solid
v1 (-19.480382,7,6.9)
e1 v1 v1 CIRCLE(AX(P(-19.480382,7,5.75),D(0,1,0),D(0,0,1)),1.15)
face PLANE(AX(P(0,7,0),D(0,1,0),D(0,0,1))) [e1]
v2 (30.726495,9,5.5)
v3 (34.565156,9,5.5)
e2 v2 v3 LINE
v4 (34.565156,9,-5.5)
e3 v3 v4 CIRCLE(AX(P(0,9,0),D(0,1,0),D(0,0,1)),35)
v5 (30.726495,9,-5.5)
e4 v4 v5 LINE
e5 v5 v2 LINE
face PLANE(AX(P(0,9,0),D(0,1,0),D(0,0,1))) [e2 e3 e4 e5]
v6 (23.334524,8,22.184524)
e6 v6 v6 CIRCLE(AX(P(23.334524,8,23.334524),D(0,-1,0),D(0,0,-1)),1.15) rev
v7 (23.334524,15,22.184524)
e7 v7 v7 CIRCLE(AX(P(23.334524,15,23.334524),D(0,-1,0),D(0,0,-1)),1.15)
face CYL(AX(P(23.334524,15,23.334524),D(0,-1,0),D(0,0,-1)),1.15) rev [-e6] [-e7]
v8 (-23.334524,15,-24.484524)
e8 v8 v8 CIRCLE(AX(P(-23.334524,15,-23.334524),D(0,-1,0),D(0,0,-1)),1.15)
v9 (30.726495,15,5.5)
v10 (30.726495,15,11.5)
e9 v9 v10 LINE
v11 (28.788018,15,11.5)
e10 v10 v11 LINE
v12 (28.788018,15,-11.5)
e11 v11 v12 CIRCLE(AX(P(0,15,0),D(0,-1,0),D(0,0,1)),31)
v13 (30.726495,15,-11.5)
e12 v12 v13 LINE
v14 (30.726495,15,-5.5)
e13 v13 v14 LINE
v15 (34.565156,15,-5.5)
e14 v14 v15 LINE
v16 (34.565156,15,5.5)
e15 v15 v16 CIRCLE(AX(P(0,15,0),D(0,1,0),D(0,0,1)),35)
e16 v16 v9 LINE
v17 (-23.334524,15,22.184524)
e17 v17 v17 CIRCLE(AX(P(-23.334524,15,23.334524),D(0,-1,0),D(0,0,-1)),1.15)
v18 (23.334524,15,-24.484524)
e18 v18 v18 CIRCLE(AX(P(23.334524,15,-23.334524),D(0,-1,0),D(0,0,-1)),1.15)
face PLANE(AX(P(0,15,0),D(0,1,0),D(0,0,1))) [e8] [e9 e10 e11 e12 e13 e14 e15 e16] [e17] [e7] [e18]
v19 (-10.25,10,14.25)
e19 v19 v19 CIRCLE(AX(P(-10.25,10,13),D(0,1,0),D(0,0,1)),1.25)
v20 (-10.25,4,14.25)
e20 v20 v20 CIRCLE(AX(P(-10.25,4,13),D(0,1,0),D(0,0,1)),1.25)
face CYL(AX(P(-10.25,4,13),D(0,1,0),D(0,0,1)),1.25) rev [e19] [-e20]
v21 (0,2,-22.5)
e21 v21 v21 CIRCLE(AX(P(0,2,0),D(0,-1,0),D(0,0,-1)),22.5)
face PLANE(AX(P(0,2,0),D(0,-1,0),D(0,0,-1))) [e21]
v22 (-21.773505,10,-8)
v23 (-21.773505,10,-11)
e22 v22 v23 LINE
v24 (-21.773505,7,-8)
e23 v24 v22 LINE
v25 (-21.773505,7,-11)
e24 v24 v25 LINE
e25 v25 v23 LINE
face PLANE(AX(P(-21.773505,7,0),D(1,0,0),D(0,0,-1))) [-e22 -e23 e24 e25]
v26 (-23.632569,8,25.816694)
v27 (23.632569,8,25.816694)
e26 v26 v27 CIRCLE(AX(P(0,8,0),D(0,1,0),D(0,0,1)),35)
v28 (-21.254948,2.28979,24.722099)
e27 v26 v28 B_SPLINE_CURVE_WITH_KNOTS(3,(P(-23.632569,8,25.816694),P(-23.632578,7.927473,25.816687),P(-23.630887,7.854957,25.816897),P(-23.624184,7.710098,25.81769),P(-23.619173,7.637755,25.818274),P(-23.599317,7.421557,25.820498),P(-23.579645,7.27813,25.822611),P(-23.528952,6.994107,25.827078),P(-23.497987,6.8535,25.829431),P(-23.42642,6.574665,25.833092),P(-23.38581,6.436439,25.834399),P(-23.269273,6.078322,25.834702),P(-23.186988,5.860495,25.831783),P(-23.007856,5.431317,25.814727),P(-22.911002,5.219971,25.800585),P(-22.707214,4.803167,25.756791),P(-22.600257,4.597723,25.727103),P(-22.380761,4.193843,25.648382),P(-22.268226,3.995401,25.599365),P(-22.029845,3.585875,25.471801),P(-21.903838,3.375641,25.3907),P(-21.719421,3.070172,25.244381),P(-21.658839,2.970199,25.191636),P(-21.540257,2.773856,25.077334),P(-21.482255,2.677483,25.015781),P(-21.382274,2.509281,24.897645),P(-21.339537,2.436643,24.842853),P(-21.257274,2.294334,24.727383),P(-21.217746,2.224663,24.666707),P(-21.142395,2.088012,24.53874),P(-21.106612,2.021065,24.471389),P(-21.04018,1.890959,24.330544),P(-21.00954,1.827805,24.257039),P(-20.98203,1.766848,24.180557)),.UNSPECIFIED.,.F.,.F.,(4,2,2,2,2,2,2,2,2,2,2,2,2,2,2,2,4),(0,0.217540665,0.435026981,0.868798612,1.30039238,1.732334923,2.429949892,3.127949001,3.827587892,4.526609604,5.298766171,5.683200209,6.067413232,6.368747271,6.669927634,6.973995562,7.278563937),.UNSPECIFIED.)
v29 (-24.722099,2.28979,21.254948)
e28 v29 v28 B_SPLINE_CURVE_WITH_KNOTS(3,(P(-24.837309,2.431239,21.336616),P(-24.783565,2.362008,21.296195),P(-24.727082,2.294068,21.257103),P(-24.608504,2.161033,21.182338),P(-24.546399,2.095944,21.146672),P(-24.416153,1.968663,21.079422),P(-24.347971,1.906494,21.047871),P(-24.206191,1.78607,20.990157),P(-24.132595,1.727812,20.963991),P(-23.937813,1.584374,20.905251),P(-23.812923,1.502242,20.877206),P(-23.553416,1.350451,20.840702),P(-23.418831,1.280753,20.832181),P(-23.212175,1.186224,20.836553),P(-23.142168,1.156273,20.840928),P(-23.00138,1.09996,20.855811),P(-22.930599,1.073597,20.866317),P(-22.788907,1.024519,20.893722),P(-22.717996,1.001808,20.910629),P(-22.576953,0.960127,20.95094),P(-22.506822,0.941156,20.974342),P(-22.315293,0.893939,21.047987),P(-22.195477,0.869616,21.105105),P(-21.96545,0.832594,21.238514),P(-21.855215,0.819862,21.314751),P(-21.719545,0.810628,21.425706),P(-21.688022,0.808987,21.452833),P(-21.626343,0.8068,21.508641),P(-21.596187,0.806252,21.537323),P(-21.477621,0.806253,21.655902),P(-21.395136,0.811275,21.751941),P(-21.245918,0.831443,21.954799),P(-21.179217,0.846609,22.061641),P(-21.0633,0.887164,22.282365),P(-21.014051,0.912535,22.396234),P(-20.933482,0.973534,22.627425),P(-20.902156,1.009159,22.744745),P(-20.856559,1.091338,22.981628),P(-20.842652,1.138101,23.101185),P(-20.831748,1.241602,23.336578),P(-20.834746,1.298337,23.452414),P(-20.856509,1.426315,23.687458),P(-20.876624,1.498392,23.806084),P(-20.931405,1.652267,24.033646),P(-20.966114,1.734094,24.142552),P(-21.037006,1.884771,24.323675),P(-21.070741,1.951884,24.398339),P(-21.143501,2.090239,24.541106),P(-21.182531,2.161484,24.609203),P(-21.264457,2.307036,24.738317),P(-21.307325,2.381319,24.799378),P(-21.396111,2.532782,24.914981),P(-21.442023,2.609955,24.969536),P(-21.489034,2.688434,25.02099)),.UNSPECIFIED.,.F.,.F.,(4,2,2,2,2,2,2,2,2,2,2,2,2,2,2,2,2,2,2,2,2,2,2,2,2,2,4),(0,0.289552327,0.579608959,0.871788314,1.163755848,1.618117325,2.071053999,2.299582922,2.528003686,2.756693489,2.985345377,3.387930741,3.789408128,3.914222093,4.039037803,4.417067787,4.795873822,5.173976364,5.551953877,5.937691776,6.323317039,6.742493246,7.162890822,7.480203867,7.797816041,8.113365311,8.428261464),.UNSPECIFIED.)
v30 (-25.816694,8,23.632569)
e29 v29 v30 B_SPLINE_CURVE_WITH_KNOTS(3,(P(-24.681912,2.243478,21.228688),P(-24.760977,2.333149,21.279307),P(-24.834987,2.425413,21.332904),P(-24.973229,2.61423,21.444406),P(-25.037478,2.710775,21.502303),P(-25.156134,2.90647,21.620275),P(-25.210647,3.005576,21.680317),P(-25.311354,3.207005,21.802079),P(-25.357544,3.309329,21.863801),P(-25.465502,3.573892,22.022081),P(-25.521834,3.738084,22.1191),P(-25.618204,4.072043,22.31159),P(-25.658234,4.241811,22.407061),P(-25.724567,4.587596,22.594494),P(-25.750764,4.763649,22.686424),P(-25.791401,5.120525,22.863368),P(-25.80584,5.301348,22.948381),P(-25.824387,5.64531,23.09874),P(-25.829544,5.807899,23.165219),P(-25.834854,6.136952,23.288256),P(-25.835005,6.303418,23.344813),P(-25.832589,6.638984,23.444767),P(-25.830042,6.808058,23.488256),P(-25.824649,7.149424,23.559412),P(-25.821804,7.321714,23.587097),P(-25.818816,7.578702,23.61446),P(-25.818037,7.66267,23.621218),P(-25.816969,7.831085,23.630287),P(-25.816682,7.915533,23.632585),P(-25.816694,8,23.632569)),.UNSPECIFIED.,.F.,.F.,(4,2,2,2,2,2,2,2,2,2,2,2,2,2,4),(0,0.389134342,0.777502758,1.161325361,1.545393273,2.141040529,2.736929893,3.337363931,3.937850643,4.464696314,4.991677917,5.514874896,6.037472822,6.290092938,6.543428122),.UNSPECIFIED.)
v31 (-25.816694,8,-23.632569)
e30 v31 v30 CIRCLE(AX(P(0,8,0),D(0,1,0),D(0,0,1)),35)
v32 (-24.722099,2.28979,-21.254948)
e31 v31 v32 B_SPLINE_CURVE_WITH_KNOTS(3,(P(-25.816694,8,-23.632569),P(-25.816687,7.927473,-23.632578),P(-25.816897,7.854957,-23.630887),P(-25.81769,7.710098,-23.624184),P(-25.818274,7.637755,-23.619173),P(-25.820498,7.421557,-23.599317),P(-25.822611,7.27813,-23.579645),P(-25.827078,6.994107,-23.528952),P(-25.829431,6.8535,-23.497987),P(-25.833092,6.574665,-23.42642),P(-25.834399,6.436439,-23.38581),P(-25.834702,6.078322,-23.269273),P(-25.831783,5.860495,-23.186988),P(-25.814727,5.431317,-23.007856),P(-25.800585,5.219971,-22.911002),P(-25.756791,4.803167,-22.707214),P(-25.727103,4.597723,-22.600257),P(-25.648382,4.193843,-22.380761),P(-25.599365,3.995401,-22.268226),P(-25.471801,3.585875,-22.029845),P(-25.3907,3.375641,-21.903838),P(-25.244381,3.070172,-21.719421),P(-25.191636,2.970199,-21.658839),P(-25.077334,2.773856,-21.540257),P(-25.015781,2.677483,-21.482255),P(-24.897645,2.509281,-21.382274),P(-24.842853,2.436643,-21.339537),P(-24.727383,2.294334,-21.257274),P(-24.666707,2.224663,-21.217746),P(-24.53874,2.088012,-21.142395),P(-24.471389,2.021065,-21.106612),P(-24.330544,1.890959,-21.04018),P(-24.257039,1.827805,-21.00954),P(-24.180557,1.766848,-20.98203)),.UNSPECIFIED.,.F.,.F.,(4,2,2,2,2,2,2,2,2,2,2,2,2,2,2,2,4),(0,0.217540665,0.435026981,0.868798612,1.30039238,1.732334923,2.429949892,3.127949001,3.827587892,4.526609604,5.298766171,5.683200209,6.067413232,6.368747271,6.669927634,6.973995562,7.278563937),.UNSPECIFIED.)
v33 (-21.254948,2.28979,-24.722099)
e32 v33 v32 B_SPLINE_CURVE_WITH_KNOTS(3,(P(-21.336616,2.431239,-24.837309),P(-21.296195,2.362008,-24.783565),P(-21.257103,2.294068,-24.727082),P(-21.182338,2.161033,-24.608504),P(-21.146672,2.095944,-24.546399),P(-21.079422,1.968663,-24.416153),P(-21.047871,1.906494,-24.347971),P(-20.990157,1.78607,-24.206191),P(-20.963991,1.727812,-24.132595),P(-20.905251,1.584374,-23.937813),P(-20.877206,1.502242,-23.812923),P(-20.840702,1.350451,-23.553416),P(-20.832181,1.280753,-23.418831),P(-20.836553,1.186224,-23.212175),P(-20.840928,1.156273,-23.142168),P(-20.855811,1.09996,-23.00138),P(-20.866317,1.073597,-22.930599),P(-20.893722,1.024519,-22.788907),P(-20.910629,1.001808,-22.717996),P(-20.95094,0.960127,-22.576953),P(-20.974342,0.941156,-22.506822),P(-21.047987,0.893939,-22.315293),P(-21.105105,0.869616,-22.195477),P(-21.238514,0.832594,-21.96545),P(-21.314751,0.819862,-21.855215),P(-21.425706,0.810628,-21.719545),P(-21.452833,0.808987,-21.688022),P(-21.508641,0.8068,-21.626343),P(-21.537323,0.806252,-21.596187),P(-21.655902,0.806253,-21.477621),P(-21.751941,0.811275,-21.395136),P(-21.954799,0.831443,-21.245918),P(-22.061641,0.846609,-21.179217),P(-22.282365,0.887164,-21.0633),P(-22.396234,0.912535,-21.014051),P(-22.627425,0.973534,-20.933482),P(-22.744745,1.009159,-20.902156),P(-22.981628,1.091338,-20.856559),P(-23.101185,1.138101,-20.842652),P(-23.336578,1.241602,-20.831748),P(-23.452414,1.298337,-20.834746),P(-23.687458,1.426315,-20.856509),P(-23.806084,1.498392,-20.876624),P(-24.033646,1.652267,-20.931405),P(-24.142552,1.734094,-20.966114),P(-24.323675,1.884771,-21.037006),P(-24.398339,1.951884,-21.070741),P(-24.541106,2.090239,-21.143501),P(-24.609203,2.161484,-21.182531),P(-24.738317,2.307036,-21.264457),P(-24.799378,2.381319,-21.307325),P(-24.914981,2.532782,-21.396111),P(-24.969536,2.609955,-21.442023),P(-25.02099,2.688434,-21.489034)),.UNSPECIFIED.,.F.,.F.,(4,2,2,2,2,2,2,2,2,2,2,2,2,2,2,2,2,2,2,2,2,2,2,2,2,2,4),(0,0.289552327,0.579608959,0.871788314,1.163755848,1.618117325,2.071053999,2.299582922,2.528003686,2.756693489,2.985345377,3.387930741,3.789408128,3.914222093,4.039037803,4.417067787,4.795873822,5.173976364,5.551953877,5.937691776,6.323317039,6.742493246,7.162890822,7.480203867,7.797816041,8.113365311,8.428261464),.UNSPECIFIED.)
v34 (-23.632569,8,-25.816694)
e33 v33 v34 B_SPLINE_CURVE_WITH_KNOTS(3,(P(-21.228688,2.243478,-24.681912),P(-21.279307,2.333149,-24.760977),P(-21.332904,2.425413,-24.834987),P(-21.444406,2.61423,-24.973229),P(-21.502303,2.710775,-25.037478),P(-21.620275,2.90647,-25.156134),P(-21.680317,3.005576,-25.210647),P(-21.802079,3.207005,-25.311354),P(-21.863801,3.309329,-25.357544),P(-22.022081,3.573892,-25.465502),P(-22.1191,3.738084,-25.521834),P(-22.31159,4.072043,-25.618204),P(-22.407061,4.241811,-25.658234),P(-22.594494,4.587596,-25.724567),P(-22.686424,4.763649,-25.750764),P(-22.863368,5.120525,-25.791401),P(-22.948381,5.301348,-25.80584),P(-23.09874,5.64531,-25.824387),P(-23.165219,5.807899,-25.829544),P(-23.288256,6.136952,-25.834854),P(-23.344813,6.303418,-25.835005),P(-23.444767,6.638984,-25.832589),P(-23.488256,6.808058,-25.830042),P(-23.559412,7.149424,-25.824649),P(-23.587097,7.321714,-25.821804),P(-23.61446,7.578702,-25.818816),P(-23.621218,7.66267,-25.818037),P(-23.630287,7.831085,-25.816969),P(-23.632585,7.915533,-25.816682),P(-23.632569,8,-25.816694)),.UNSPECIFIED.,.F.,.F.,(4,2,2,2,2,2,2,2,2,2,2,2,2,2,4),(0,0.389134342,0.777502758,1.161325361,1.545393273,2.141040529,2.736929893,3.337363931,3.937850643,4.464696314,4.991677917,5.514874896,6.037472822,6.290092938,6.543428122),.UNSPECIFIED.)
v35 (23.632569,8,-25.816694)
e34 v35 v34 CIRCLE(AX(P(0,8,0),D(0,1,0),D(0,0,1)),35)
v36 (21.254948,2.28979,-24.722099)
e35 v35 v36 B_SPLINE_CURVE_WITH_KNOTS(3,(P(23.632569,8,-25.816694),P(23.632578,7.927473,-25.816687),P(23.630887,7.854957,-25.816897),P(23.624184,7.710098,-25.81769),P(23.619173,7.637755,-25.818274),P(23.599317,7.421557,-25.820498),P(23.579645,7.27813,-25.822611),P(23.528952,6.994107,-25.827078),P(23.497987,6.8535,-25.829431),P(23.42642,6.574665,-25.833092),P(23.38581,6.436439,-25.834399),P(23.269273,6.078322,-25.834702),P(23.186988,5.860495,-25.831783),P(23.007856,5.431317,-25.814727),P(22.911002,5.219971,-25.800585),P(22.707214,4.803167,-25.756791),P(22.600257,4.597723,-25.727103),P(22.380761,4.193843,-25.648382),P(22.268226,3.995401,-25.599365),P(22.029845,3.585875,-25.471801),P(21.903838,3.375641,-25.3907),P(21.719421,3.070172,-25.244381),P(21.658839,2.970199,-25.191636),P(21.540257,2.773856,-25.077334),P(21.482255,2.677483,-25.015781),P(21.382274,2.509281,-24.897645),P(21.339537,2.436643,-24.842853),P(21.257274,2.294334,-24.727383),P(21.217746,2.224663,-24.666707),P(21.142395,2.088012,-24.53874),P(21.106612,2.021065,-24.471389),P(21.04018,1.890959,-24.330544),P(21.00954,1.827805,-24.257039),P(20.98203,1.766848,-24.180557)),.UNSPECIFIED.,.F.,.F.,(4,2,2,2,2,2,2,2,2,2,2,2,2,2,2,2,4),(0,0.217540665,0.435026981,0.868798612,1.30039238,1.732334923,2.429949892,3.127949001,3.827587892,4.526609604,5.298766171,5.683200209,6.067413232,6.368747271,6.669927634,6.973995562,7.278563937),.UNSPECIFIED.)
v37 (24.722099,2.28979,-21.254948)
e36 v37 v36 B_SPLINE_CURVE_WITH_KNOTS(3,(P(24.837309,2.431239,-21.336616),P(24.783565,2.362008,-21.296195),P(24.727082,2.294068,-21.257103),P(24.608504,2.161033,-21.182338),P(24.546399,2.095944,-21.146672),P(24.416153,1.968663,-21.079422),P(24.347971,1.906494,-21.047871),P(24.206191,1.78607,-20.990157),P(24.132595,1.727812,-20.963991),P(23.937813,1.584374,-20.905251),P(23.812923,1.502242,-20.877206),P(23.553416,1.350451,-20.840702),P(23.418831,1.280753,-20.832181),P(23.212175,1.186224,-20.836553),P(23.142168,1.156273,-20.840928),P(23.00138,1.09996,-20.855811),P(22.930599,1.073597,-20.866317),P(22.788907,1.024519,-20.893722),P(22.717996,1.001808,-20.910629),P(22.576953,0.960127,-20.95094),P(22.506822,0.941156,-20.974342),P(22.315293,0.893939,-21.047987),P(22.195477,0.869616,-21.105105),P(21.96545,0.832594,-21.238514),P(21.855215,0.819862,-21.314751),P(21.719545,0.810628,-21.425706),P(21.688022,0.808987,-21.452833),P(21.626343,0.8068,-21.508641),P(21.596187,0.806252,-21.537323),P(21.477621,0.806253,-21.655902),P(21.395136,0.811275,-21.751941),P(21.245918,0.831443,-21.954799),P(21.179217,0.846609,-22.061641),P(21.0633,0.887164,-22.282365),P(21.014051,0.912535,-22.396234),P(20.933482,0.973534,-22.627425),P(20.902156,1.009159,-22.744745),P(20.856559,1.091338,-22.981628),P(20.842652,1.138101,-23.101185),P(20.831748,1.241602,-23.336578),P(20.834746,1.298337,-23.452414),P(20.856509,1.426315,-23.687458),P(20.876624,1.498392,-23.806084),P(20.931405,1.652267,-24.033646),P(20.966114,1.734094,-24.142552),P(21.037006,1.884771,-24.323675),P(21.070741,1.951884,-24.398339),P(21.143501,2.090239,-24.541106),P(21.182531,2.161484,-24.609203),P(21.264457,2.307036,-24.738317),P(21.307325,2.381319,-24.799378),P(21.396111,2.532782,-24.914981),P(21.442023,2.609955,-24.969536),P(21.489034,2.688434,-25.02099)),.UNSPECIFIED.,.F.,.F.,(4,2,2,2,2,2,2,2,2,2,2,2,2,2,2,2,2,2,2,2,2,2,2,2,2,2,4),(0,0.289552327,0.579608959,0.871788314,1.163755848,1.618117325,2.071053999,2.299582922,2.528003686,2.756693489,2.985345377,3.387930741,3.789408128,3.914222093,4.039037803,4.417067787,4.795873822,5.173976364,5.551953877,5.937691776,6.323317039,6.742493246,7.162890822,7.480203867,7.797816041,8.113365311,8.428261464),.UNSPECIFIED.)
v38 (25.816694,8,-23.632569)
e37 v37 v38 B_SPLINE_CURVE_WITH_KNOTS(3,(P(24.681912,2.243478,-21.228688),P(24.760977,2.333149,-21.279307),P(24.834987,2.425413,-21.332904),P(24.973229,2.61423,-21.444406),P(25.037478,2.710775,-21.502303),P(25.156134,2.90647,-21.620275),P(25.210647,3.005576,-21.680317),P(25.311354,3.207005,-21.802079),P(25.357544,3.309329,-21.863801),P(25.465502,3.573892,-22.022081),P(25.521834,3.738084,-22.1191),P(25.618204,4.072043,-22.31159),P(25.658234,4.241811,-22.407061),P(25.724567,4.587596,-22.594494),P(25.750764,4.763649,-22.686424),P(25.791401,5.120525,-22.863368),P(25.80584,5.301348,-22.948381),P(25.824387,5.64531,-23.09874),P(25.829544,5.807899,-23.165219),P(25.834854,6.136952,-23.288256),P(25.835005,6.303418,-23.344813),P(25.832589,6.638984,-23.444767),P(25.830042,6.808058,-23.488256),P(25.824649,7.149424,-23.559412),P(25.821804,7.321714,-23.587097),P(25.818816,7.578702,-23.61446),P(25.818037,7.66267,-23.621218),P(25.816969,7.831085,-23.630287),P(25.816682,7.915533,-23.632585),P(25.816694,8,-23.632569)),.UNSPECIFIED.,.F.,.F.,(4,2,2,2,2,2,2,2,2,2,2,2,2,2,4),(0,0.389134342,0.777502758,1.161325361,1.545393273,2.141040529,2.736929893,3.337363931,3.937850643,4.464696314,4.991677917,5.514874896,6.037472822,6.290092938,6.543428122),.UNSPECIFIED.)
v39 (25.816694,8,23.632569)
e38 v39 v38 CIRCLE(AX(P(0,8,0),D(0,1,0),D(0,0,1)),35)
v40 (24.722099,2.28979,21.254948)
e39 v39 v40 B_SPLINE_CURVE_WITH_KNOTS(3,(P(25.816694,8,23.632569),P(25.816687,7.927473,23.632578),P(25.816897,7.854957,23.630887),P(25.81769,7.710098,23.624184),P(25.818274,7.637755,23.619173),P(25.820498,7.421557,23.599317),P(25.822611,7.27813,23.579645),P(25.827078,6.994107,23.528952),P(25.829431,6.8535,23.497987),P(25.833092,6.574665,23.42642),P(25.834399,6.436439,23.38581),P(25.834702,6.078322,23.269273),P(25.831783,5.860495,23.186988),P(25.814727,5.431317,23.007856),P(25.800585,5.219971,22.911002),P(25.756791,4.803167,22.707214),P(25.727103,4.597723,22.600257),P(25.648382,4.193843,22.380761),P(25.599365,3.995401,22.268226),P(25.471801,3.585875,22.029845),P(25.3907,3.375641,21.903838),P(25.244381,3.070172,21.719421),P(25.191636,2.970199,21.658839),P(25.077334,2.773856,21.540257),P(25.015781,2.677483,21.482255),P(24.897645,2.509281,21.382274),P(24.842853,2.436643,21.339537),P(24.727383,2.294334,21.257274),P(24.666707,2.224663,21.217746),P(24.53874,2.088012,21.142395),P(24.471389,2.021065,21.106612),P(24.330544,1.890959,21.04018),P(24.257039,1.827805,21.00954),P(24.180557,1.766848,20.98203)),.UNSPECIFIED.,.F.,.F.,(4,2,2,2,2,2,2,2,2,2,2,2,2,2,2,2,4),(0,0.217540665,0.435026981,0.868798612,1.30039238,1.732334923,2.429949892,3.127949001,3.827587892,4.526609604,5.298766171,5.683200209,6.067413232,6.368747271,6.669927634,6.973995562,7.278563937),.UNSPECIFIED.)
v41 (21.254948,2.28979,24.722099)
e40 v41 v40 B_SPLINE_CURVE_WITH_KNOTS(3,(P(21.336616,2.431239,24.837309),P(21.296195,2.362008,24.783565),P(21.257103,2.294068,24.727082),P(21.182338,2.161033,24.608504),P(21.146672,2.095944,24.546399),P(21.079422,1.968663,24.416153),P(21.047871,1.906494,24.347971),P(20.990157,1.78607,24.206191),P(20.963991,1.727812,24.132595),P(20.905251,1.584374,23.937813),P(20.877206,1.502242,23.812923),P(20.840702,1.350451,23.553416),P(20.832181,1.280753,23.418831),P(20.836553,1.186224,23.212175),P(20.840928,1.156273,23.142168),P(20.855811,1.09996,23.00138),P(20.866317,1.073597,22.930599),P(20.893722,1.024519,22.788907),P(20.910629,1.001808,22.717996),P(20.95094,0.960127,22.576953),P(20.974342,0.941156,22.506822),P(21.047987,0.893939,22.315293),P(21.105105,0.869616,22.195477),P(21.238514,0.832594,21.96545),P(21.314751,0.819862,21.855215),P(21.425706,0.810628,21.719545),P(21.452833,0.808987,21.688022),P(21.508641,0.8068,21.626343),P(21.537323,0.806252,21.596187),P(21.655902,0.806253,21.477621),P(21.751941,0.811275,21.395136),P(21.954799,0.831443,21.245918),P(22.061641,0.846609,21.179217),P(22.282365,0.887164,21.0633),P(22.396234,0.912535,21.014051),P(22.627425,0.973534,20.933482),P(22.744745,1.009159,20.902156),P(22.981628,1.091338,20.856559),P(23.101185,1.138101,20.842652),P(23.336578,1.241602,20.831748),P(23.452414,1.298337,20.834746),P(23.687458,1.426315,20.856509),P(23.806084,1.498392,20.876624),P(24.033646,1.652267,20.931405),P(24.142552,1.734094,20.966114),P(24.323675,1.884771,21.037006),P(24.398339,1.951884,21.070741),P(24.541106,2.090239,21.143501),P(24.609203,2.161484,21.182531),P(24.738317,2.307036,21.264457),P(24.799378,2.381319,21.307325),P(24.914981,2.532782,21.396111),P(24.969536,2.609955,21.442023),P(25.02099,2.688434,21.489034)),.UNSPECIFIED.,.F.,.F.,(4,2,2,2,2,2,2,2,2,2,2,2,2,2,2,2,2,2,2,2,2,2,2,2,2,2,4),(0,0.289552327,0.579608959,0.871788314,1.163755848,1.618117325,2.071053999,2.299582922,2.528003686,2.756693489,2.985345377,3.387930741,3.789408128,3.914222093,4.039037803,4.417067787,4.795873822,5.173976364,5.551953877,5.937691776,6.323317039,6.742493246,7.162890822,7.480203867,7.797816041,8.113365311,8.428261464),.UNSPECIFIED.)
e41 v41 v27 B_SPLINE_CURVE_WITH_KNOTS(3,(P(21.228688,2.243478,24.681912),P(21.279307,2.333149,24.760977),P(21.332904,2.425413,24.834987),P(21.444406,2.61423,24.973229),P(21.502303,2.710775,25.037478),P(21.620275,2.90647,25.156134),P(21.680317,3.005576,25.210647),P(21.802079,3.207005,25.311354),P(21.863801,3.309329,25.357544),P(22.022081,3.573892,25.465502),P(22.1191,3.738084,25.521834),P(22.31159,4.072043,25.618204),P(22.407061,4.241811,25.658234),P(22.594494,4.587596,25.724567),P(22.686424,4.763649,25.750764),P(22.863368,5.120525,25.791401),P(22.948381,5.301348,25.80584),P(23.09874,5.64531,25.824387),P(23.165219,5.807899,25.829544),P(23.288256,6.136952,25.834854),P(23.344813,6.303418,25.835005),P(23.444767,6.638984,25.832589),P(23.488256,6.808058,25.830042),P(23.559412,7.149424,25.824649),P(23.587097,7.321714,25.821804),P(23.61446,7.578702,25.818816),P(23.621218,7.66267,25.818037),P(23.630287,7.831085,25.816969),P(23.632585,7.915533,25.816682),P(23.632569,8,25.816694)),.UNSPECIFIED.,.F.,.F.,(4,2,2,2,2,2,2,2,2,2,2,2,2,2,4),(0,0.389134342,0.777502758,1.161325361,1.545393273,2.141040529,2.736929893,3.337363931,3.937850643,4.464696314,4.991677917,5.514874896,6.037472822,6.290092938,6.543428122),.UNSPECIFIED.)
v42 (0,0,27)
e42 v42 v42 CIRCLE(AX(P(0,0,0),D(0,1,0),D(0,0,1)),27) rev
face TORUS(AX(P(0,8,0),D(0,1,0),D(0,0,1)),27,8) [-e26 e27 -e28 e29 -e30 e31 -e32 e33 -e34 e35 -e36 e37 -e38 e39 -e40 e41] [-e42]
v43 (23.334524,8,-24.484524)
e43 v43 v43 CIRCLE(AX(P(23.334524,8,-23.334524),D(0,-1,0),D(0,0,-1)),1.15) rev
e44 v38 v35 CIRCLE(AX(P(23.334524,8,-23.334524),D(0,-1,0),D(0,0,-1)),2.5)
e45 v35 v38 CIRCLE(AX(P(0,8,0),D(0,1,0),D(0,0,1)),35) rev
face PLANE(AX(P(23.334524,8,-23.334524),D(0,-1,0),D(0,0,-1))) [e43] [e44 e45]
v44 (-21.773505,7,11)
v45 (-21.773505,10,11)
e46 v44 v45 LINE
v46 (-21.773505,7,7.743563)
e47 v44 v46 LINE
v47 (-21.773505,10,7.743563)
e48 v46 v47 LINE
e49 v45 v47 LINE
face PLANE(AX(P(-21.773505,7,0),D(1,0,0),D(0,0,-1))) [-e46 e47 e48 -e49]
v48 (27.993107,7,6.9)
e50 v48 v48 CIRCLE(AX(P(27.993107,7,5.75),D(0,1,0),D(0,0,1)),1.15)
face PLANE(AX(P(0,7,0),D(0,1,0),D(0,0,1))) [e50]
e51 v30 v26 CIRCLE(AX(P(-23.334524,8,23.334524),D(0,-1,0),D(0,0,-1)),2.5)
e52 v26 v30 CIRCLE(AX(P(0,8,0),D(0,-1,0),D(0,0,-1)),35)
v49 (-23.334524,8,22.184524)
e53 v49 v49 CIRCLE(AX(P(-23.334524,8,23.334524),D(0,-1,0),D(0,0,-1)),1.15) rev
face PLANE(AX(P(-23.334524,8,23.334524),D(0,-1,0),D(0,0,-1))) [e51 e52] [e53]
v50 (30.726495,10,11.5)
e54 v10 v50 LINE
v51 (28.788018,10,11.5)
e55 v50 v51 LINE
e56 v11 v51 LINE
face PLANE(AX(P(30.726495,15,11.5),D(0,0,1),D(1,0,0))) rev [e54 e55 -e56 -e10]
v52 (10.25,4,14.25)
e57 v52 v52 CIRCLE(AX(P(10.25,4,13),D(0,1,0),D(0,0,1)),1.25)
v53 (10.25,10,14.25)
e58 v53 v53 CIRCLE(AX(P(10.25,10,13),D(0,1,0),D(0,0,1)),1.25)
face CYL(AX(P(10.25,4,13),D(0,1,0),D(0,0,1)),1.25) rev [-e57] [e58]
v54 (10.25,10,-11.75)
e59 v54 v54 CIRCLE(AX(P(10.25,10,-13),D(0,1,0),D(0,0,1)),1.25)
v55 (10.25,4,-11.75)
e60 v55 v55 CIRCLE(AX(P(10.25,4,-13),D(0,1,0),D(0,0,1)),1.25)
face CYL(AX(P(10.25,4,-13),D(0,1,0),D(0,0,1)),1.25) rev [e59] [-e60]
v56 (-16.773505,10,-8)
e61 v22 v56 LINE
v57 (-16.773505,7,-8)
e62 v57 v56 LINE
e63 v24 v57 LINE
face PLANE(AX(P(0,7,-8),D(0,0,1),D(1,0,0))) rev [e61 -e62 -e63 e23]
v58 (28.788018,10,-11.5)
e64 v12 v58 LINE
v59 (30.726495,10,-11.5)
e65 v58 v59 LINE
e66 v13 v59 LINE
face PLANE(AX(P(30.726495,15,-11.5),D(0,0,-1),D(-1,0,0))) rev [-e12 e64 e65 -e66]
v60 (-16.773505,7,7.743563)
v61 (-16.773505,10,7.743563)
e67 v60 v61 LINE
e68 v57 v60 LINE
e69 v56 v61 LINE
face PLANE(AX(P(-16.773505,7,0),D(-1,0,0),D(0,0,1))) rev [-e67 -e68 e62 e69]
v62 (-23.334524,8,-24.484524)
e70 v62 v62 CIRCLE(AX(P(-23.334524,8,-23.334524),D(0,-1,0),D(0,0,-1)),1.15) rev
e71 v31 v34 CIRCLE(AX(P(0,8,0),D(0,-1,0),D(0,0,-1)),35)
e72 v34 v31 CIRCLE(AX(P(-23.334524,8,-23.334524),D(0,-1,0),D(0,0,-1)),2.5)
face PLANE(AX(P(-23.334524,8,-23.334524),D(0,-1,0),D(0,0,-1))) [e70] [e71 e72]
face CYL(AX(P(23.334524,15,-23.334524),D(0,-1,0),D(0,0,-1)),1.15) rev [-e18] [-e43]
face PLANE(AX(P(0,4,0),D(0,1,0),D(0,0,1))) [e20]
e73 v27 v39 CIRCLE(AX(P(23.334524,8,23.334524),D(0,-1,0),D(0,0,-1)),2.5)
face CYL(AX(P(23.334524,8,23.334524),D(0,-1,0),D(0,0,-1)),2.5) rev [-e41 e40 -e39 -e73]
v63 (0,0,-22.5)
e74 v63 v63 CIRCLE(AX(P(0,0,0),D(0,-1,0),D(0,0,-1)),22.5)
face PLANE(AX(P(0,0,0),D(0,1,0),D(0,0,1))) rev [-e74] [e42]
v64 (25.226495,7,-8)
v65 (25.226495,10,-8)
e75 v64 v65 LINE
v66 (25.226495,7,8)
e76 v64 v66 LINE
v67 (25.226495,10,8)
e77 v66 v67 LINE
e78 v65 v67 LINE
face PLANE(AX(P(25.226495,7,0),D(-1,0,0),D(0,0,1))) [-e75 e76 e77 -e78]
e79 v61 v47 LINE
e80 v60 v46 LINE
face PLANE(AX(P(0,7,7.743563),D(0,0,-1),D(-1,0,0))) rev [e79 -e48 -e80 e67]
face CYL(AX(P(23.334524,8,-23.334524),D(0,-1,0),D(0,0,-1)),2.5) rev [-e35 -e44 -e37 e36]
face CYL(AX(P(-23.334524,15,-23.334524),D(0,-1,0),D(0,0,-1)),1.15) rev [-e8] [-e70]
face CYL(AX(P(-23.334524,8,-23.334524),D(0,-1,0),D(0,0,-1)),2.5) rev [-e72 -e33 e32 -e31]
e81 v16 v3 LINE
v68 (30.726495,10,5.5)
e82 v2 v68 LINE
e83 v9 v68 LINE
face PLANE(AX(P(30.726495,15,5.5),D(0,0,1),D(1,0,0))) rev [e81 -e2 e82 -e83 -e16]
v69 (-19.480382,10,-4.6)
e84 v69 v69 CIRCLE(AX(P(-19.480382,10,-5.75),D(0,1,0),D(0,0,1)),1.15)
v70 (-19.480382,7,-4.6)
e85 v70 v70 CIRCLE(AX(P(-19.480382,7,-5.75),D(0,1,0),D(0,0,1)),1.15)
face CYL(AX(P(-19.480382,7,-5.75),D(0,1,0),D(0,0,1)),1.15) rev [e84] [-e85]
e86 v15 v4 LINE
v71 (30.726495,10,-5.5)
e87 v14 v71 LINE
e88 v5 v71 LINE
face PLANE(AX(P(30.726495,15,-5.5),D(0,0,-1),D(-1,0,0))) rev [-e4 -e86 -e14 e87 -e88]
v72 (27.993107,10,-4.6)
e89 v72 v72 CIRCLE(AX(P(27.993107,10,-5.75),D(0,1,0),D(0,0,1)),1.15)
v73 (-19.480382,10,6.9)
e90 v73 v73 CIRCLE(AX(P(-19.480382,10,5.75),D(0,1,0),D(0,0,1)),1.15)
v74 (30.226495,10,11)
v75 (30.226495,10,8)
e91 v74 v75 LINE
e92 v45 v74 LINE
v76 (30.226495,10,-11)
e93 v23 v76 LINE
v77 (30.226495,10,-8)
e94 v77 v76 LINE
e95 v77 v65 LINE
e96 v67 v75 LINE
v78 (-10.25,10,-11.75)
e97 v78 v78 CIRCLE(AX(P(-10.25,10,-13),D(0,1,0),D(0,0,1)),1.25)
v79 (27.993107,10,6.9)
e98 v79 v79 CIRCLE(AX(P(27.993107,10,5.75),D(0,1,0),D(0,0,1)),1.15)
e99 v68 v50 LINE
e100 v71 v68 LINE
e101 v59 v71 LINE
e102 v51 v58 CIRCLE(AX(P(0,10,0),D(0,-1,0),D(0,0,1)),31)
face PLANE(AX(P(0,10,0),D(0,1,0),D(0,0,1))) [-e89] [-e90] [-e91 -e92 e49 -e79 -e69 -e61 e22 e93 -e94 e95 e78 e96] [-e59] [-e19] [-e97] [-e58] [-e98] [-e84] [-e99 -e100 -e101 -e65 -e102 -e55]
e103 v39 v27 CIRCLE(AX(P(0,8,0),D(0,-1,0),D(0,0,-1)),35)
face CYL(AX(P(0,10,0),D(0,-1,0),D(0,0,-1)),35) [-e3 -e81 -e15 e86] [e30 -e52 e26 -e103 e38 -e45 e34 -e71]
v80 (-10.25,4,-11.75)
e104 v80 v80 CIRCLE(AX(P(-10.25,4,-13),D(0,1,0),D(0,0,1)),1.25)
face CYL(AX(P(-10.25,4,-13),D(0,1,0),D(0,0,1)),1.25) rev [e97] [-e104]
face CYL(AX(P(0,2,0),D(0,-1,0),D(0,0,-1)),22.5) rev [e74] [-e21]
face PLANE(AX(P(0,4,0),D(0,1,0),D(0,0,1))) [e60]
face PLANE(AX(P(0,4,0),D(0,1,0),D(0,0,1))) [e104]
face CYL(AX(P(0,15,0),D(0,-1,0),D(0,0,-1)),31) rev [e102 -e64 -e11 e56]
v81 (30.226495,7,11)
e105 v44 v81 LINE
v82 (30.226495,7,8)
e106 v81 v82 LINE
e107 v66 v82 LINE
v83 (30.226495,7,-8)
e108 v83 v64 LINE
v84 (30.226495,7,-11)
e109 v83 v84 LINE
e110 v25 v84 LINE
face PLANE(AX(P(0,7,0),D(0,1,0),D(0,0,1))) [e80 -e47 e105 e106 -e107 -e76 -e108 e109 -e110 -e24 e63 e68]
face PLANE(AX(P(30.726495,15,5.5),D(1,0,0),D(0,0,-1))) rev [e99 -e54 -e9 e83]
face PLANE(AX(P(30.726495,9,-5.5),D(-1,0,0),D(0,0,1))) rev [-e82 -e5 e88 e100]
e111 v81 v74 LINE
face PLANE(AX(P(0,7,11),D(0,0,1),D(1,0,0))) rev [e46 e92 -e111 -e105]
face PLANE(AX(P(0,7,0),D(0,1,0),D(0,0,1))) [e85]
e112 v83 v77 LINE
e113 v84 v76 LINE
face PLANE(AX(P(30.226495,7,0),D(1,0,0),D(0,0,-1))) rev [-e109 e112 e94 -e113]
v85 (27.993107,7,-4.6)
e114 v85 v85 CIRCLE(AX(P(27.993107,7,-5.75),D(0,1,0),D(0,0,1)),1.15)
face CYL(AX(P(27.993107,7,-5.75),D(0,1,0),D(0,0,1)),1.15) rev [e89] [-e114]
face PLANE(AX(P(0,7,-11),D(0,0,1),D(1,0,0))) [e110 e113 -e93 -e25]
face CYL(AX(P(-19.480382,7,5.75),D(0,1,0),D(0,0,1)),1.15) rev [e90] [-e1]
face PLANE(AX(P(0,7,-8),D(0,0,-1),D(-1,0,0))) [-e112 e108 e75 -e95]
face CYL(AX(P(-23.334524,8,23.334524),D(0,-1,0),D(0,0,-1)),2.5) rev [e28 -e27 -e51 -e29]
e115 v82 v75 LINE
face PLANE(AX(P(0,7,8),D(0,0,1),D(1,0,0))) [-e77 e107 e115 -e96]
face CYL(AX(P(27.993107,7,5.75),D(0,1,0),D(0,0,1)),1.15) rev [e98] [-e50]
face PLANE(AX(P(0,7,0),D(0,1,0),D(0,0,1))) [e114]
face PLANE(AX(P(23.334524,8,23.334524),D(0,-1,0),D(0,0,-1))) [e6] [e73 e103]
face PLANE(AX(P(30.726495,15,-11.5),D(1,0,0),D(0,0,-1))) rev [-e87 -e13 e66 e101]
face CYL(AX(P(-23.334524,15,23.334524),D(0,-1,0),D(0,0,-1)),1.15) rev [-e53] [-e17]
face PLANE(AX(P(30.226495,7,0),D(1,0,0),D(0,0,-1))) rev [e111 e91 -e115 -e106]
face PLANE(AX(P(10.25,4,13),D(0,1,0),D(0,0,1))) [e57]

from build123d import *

# Parameters (mm, degrees)
SKETCH1_R               = 35
BOSS_EXTRUDE1_DEPTH     = 10
SKETCH2_R               = 1.15
CUT_EXTRUDE1_DEPTH      = 3
BOSS_EXTRUDE2_DEPTH     = 5
CUT_EXTRUDE3_DEPTH      = 52.720402164
CUT_EXTRUDE3_DEPTH_BACK = 52.720402164
SKETCH12_R              = 1.15
CUT_EXTRUDE4_START      = -8
CUT_EXTRUDE4_OUTLINE_R  = 1.15
CUT_EXTRUDE4_DEPTH      = 9
SKETCH14_R              = 22.5
CUT_EXTRUDE5_DEPTH      = 2
SKETCH15_R              = 1.25
CUT_EXTRUDE6_DEPTH      = 6
CUT_EXTRUDE7_START      = -1
CUT_EXTRUDE7_DEPTH      = 6


with BuildPart() as part:
    # Sketch1 → Boss-Extrude1 (new body)
    with BuildSketch(Plane(origin=(0, 0, 0), x_dir=(1, 0, 0), z_dir=(0, 1, 0))):
        with Locations(Location((0, 0, 0), (0, 0, 270))):
            Circle(SKETCH1_R)
    extrude(amount=BOSS_EXTRUDE1_DEPTH)

    # Sketch2 → Cut-Extrude1 (cut)
    with BuildSketch(Plane(origin=(0, 10, 0), x_dir=(1, 0, 0), z_dir=(0, 1, 0))):
        Polygon((-21.773504548, -7.743563281), (-21.773504548, -11), (30.226495452, -11), (30.226495452, -8), (25.226495452, -8), (25.226495452, 8), (30.226495452, 8), (30.226495452, 11), (-21.773504548, 11), (-21.773504548, 8), (-16.773504548, 8), (-16.773504548, -7.743563281), align=None)
        with Locations(Location((-19.480382443, -5.75, 0), (0, 0, 270))):
            Circle(SKETCH2_R)
        with Locations(Location((-19.480382443, 5.75, 0), (0, 0, 270))):
            Circle(SKETCH2_R)
        with Locations(Location((27.993107277, 5.75, 0), (0, 0, 270))):
            Circle(SKETCH2_R)
        with Locations(Location((27.993107277, -5.75, 0), (0, 0, 270))):
            Circle(SKETCH2_R)
    extrude(amount=-CUT_EXTRUDE1_DEPTH, mode=Mode.SUBTRACT)

    # Sketch3 → Boss-Extrude2 (add)
    with BuildSketch(Plane(origin=(0, 10, 0), x_dir=(1, 0, 0), z_dir=(0, 1, 0))):
        with BuildLine():
            Line((30.726495452, 11.5), (30.726495452, 5.5))
            Line((30.726495452, 5.5), (34.565155865, 5.5))
            ThreePointArc((34.565155865, 5.5), (-35, 0), (34.565155865, -5.5))
            Line((34.565155865, -5.5), (30.726495452, -5.5))
            Line((30.726495452, -5.5), (30.726495452, -11.5))
            Line((30.726495452, -11.5), (28.788018341, -11.5))
            ThreePointArc((28.788018341, -11.5), (-31, 0), (28.788018341, 11.5))
            Line((28.788018341, 11.5), (30.726495452, 11.5))
        make_face()
    extrude(amount=BOSS_EXTRUDE2_DEPTH)

    # Sketch12 → Cut-Extrude3 (cut, two sides: drawn at the far end of the back side and taken through both)
    with BuildSketch(Plane.XZ.offset(-CUT_EXTRUDE3_DEPTH_BACK)):
        with Locations(Location((-23.334523779, 23.334523779, 0), (0, 0, 270))):
            Circle(SKETCH12_R)
        with Locations(Location((23.334523779, 23.334523779, 0), (0, 0, 270))):
            Circle(SKETCH12_R)
        with Locations(Location((23.334523779, -23.334523779, 0), (0, 0, 270))):
            Circle(SKETCH12_R)
        with Locations(Location((-23.334523779, -23.334523779, 0), (0, 0, 270))):
            Circle(SKETCH12_R)
    extrude(amount=CUT_EXTRUDE3_DEPTH + CUT_EXTRUDE3_DEPTH_BACK, mode=Mode.SUBTRACT)

    # Cut-Extrude4: read off the stored shape, not the designer's step
    # Cut-Extrude4 outline → Cut-Extrude4 (cut)
    # profile 1 of 4: a face of its own
    with BuildSketch(Plane.XZ.offset(CUT_EXTRUDE4_START)):
        with BuildLine():
            ThreePointArc((-25.816694029, -23.632568828), (-24.748737342, -24.748737342), (-23.632568828, -25.816694029))
            ThreePointArc((-23.632568828, -25.816694029), (-21.566756826, -21.566756826), (-25.816694029, -23.632568828))
        make_face()
        with Locations((-23.334523779, -23.334523779)):
            Circle(CUT_EXTRUDE4_OUTLINE_R, mode=Mode.SUBTRACT)
    # profile 2 of 4: a face of its own
    with BuildSketch(Plane.XZ.offset(CUT_EXTRUDE4_START)):
        with BuildLine():
            ThreePointArc((25.816694029, -23.632568828), (21.566756826, -21.566756826), (23.632568828, -25.816694029))
            ThreePointArc((23.632568828, -25.816694029), (24.748737342, -24.748737342), (25.816694029, -23.632568828))
        make_face()
        with Locations((23.334523779, -23.334523779)):
            Circle(CUT_EXTRUDE4_OUTLINE_R, mode=Mode.SUBTRACT)
    # profile 3 of 4: a face of its own
    with BuildSketch(Plane.XZ.offset(CUT_EXTRUDE4_START)):
        with BuildLine():
            ThreePointArc((-23.632568828, 25.816694029), (-24.748737342, 24.748737342), (-25.816694029, 23.632568828))
            ThreePointArc((-25.816694029, 23.632568828), (-21.566756826, 21.566756826), (-23.632568828, 25.816694029))
        make_face()
        with Locations((-23.334523779, 23.334523779)):
            Circle(CUT_EXTRUDE4_OUTLINE_R, mode=Mode.SUBTRACT)
    # profile 4 of 4: a face of its own
    with BuildSketch(Plane.XZ.offset(CUT_EXTRUDE4_START)):
        with BuildLine():
            ThreePointArc((25.816694029, 23.632568828), (24.748737342, 24.748737342), (23.632568828, 25.816694029))
            ThreePointArc((23.632568828, 25.816694029), (21.566756826, 21.566756826), (25.816694029, 23.632568828))
        make_face()
        with Locations((23.334523779, 23.334523779)):
            Circle(CUT_EXTRUDE4_OUTLINE_R, mode=Mode.SUBTRACT)
    extrude(amount=CUT_EXTRUDE4_DEPTH, mode=Mode.SUBTRACT)

    # Fillet2: read off the stored shape, not the designer's step
    # Fillet2 outline → Fillet2 (revolve, cut)
    with BuildSketch(Plane.XY):
        with BuildLine():
            ThreePointArc((35, 8), (32.656854249, 2.343145751), (27, 0))
            Line((27, 0), (35, 0))
            Line((35, 0), (35, 8))
        make_face()
    revolve(axis=Axis((0, 0, 0), (0, 1, 0)), mode=Mode.SUBTRACT)

    # Sketch14 → Cut-Extrude5 (cut)
    with BuildSketch(Plane.XZ):
        with Locations(Location((0, 0, 0), (0, 0, 270))):
            Circle(SKETCH14_R)
    extrude(amount=-CUT_EXTRUDE5_DEPTH, mode=Mode.SUBTRACT)

    # Sketch15 → Cut-Extrude6 (cut)
    with BuildSketch(Plane(origin=(0, 10, 0), x_dir=(1, 0, 0), z_dir=(0, 1, 0))):
        with Locations(Location((-10.25, 13, 0), (0, 0, 270))):
            Circle(SKETCH15_R)
        with Locations(Location((-10.25, -13, 0), (0, 0, 270))):
            Circle(SKETCH15_R)
        with Locations(Location((10.25, 13, 0), (0, 0, 270))):
            Circle(SKETCH15_R)
        with Locations(Location((10.25, -13, 0), (0, 0, 270))):
            Circle(SKETCH15_R)
    extrude(amount=-CUT_EXTRUDE6_DEPTH, mode=Mode.SUBTRACT)

    # Cut-Extrude7: read off the stored shape, not the designer's step
    # Cut-Extrude7 outline → Cut-Extrude7 (cut)
    with BuildSketch(Plane(origin=(0, 10, 0), x_dir=(1, 0, 0), z_dir=(0, 1, 0)).offset(CUT_EXTRUDE7_START)):
        with BuildLine():
            ThreePointArc((34.565155865, -5.5), (35, 0), (34.565155865, 5.5))
            Line((34.565155865, 5.5), (30.726495452, 5.5))
            Line((30.726495452, 5.5), (30.726495452, -5.5))
            Line((30.726495452, -5.5), (34.565155865, -5.5))
        make_face()
    extrude(amount=CUT_EXTRUDE7_DEPTH, mode=Mode.SUBTRACT)


solid = part.part
